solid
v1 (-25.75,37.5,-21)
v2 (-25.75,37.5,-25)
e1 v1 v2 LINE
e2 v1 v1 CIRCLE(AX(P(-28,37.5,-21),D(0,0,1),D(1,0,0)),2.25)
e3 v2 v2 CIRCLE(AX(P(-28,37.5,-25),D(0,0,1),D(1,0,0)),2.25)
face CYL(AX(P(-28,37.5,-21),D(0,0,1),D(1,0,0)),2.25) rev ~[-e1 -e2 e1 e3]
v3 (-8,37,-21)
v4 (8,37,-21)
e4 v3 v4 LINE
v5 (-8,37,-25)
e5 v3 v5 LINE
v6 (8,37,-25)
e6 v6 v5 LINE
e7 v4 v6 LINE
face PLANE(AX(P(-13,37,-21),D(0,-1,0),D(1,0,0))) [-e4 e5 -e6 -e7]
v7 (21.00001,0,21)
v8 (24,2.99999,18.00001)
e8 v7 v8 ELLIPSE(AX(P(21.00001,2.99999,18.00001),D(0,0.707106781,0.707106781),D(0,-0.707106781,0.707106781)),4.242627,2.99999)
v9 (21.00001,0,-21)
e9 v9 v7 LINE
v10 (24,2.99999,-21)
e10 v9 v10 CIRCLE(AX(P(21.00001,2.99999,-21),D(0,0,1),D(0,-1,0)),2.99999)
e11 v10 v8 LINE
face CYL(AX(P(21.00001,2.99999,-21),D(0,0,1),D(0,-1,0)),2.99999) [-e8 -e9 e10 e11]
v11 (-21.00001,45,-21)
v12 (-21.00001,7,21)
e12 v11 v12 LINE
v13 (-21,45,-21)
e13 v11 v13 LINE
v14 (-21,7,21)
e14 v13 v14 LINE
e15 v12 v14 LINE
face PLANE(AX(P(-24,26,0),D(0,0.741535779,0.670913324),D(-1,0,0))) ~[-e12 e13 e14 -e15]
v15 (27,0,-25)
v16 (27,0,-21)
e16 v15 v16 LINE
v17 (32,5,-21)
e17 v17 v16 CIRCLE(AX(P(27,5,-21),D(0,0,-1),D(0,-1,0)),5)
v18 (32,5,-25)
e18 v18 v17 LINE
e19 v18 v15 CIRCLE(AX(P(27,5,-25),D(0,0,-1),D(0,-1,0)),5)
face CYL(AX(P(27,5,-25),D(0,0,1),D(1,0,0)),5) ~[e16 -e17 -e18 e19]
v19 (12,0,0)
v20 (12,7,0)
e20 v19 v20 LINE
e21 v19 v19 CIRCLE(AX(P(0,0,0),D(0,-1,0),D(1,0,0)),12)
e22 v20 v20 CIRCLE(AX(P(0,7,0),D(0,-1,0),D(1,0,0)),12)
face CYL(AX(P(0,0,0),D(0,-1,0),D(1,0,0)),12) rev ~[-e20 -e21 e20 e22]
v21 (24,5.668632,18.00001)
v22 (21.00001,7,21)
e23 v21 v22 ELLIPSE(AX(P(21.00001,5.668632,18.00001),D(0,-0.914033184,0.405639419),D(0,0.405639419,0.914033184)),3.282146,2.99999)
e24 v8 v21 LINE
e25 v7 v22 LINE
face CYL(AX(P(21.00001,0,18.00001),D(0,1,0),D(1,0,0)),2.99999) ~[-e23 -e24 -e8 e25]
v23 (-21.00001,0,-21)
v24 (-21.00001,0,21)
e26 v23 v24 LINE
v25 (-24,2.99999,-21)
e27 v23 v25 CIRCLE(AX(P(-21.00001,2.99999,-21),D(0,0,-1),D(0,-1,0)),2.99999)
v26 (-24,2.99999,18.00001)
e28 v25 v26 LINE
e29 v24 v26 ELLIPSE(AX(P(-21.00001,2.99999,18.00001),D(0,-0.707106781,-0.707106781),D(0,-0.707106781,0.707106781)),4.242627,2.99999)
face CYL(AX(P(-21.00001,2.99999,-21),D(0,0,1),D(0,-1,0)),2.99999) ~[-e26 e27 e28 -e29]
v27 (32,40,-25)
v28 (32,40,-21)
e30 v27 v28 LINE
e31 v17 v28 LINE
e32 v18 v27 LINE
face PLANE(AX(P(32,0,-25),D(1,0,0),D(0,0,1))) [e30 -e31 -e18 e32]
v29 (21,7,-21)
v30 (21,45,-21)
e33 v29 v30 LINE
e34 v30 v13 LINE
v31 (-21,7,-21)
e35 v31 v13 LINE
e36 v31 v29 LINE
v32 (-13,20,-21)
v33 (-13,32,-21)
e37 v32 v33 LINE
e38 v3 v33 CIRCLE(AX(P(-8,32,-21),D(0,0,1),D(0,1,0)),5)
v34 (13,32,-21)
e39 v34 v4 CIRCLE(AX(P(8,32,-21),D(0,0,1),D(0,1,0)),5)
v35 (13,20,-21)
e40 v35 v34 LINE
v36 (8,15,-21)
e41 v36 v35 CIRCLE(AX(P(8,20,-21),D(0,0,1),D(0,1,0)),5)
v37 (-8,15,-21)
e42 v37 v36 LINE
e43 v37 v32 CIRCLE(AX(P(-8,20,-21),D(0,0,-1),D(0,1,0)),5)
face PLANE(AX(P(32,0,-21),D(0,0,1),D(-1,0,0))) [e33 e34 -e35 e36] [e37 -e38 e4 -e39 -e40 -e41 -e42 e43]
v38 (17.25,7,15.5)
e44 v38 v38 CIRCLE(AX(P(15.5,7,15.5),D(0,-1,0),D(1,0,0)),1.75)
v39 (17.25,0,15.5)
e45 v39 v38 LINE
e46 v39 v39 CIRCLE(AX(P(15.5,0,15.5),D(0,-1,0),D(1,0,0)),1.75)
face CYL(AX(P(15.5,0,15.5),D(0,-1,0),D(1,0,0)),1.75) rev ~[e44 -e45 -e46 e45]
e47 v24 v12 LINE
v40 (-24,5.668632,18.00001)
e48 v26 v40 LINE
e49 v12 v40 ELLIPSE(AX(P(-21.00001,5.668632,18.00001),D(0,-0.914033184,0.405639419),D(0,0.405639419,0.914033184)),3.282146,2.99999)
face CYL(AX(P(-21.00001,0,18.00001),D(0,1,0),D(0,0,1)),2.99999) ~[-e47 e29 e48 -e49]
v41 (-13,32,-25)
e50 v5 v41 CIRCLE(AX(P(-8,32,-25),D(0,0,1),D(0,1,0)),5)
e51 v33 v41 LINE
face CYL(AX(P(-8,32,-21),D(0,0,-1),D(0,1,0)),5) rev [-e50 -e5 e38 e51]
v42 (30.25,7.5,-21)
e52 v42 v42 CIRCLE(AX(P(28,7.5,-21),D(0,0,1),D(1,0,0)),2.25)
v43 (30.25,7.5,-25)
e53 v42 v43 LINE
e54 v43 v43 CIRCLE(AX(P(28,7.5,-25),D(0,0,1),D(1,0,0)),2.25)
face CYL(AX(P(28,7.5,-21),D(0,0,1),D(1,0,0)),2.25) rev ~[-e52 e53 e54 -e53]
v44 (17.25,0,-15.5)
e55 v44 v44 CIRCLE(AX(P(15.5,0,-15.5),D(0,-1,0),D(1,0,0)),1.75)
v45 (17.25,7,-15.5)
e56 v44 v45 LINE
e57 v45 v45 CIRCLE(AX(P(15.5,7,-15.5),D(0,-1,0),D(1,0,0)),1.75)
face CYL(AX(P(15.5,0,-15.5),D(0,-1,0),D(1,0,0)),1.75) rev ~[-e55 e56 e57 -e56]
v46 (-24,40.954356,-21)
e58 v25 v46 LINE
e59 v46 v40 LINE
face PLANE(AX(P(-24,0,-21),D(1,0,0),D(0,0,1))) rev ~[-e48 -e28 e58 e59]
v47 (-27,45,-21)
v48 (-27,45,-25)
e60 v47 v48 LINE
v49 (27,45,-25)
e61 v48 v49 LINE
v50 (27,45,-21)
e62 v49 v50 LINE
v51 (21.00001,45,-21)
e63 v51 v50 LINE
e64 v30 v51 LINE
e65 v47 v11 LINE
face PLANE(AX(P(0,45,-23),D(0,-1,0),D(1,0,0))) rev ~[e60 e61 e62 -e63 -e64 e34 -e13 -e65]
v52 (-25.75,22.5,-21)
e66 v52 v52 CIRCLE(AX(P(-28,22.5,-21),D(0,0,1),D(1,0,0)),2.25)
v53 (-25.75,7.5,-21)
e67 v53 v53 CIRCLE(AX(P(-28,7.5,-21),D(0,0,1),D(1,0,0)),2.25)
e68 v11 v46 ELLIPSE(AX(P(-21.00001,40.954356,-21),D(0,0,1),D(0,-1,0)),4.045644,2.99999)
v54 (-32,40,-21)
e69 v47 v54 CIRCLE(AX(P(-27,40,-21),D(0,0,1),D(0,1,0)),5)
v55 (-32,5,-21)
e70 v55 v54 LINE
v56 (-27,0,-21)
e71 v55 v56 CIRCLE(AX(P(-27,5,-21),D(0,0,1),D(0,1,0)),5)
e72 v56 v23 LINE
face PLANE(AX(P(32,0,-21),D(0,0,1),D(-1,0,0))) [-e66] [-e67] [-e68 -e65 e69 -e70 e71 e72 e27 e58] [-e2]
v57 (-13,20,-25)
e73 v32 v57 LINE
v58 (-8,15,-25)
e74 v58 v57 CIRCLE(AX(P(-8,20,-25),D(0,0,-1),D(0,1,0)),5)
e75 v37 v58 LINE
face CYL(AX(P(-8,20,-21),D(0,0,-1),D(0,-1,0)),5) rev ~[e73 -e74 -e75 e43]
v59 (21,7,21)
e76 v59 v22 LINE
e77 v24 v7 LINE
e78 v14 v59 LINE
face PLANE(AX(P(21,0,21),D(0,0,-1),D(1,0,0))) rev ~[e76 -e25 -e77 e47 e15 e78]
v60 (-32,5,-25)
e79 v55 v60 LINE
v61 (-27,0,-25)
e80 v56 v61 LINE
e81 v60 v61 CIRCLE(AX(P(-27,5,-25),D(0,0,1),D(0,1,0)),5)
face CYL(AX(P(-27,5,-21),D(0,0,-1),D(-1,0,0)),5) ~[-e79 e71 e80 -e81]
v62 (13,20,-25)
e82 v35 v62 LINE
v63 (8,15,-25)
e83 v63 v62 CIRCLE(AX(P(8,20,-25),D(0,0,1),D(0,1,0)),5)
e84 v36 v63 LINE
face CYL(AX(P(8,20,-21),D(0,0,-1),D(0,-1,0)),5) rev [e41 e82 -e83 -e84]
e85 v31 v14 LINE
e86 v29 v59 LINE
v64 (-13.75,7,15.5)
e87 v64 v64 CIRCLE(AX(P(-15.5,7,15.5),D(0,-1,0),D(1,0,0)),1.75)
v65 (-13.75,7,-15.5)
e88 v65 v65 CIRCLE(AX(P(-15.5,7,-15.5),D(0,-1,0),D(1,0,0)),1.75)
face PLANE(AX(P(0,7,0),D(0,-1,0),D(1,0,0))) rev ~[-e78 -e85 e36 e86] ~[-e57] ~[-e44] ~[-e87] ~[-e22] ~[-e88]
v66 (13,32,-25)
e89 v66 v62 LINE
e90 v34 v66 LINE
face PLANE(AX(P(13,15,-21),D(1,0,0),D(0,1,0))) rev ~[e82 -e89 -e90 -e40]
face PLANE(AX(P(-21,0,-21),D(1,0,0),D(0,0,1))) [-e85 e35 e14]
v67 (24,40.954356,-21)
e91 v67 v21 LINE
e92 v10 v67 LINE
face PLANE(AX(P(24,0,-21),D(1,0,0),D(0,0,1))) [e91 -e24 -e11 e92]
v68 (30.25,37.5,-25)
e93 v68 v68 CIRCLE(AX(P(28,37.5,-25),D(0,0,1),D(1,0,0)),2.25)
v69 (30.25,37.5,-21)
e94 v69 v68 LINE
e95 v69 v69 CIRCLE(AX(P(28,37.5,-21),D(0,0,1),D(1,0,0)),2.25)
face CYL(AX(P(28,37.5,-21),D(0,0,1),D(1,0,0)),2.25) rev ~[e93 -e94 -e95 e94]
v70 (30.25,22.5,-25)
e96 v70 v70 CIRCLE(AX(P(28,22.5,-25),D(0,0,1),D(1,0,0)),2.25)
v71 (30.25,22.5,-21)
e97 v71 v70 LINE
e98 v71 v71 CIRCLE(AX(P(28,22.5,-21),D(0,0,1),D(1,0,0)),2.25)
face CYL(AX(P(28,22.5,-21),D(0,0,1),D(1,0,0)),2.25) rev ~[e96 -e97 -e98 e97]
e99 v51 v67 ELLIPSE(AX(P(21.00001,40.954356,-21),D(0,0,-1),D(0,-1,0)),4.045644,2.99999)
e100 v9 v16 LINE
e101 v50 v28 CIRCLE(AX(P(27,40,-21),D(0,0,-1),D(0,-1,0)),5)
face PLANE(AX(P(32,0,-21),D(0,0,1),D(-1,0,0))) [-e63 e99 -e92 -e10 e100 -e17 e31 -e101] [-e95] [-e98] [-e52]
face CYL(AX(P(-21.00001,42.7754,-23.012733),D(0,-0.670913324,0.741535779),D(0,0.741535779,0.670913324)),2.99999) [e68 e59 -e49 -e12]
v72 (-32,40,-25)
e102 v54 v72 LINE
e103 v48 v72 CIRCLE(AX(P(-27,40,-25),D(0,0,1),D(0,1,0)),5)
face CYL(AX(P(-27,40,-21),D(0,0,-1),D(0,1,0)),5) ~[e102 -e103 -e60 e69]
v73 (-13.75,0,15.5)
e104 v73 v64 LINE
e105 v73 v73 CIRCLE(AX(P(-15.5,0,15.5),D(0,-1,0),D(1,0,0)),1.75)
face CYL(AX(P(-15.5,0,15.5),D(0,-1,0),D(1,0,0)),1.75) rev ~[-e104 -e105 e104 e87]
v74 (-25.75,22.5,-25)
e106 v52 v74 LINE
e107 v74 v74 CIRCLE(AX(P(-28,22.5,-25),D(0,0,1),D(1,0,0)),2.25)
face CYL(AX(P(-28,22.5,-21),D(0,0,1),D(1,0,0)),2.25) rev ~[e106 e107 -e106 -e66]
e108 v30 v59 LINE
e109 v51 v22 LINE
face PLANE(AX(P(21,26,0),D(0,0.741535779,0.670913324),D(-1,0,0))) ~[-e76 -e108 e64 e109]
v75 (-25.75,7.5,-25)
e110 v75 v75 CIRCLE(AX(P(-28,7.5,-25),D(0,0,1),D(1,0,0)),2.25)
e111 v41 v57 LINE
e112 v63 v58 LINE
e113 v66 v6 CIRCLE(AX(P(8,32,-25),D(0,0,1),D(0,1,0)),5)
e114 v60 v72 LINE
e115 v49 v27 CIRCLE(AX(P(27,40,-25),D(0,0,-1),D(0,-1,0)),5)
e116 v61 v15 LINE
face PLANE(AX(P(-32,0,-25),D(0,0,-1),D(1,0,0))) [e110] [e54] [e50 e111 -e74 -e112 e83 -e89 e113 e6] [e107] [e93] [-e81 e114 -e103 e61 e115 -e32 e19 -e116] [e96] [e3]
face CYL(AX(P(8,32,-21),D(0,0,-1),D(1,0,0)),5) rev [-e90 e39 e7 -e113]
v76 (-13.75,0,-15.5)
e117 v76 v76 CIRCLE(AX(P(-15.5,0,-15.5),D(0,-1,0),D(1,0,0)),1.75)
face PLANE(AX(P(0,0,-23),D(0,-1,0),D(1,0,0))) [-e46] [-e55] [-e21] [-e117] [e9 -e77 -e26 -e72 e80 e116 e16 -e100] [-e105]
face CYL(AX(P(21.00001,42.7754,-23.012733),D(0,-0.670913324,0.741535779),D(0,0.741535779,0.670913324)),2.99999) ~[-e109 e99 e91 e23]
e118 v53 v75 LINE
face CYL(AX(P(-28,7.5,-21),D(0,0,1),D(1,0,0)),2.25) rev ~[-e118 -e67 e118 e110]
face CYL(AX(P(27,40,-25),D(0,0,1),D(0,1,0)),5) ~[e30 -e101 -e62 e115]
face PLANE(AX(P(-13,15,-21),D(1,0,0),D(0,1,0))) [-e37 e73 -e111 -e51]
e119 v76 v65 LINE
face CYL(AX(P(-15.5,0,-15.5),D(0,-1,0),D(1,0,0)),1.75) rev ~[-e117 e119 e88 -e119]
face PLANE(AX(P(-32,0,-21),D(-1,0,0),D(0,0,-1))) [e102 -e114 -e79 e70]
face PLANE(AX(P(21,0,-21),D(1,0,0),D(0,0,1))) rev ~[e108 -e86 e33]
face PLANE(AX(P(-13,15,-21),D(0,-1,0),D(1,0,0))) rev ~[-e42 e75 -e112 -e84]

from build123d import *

# Parameters (mm, degrees)
F0_W      = 42
F0_H      = 42
F0_R      = 1.75
F0_R_2    = 12
F1_DEPTH  = 7
F0_W_2    = 3
F2_DEPTH  = 45
F3_DEPTH  = 45
F4_SIZE2  = 38
F4_SIZE   = 42
F5_R      = 2.25
F6_DEPTH  = 25
F7_R      = 5
F8_R      = 2.99999
F9_W      = 26
F9_H      = 22
F10_DEPTH = 25
F11_R     = 5


# Not quite as in the source:
# - a fillet or chamfer is up to 0.001 mm smaller than in the source, because OpenCascade refuses the exact size


with BuildPart() as f1:
    # F0 (on Front) → F1 (new body)
    with BuildSketch(Plane.XZ):
        Rectangle(F0_W, F0_H)
        with Locations((-15.5, -15.5)):
            Circle(F0_R, mode=Mode.SUBTRACT)
        with Locations((15.5, -15.5)):
            Circle(F0_R, mode=Mode.SUBTRACT)
        with Locations((-15.5, 15.5)):
            Circle(F0_R, mode=Mode.SUBTRACT)
        Circle(F0_R_2, mode=Mode.SUBTRACT)
        with Locations((15.5, 15.5)):
            Circle(F0_R, mode=Mode.SUBTRACT)
    extrude(amount=-F1_DEPTH)

    # F0 (on Front) → F2 (join)
    with BuildSketch(Plane.XZ):
        with Locations((22.5, 0)):
            Rectangle(F0_W_2, F0_H)
        with Locations((-22.5, 0)):
            Rectangle(F0_W_2, F0_H)
    extrude(amount=-F2_DEPTH)

    # F0 (on Front) → F3 (join, through all)
    with BuildSketch(Plane.XZ):
        Polygon((24, -21), (21, -21), (-21, -21), (-24, -21), (-32, -21), (-32, -25), (32, -25), (32, -21), align=None)
    extrude(amount=-F3_DEPTH)

    # F4
    f4_edges = [f1.edges().sort_by_distance(p)[0] for p in [
        (22.5, 45, 21),
        (-22.5, 45, 21),
    ]]
    f4_side = f1.faces().sort_by_distance((-31.211838, 45, -23))[0]
    chamfer(f4_edges, length=F4_SIZE, length2=F4_SIZE2, reference=f4_side)

    # F5 (on face) → F6 (cut)
    with BuildSketch(Plane.XY.offset(-21)):
        with Locations((28, 7.5)):
            Circle(F5_R)
        with Locations((28, 22.5)):
            Circle(F5_R)
        with Locations((28, 37.5)):
            Circle(F5_R)
        with Locations((-28, 7.5)):
            Circle(F5_R)
        with Locations((-28, 22.5)):
            Circle(F5_R)
        with Locations((-28, 37.5)):
            Circle(F5_R)
    extrude(amount=-F6_DEPTH, mode=Mode.SUBTRACT)

    # F7
    f7_edges = [f1.edges().sort_by_distance(p)[0] for p in [
        (-32, 0, -23),
        (-32, 45, -23),
        (32, 0, -23),
        (32, 45, -23),
    ]]
    fillet(f7_edges, radius=F7_R)

    # F8 (radius 3 in the source; OpenCascade refuses exactly that, so slightly less here)
    f8_edges = [f1.edges().sort_by_distance(p)[0] for p in [
        (24, 0, 0),
        (-24, 0, 0),
        (-24, 26, 0),
        (-24, 3.5, 21),
        (24, 3.5, 21),
        (24, 26, 0),
    ]]
    fillet(f8_edges, radius=F8_R)

    # F9 (on face) → F10 (cut)
    with BuildSketch(Plane.XY.offset(-21)):
        with Locations((0, 26)):
            Rectangle(F9_W, F9_H)
    extrude(amount=-F10_DEPTH, mode=Mode.SUBTRACT)

    # F11
    f11_edges = [f1.edges().sort_by_distance(p)[0] for p in [
        (13, 15, -23),
        (-13, 15, -23),
        (-13, 37, -23),
        (13, 37, -23),
    ]]
    fillet(f11_edges, radius=F11_R)


solid = f1.part
